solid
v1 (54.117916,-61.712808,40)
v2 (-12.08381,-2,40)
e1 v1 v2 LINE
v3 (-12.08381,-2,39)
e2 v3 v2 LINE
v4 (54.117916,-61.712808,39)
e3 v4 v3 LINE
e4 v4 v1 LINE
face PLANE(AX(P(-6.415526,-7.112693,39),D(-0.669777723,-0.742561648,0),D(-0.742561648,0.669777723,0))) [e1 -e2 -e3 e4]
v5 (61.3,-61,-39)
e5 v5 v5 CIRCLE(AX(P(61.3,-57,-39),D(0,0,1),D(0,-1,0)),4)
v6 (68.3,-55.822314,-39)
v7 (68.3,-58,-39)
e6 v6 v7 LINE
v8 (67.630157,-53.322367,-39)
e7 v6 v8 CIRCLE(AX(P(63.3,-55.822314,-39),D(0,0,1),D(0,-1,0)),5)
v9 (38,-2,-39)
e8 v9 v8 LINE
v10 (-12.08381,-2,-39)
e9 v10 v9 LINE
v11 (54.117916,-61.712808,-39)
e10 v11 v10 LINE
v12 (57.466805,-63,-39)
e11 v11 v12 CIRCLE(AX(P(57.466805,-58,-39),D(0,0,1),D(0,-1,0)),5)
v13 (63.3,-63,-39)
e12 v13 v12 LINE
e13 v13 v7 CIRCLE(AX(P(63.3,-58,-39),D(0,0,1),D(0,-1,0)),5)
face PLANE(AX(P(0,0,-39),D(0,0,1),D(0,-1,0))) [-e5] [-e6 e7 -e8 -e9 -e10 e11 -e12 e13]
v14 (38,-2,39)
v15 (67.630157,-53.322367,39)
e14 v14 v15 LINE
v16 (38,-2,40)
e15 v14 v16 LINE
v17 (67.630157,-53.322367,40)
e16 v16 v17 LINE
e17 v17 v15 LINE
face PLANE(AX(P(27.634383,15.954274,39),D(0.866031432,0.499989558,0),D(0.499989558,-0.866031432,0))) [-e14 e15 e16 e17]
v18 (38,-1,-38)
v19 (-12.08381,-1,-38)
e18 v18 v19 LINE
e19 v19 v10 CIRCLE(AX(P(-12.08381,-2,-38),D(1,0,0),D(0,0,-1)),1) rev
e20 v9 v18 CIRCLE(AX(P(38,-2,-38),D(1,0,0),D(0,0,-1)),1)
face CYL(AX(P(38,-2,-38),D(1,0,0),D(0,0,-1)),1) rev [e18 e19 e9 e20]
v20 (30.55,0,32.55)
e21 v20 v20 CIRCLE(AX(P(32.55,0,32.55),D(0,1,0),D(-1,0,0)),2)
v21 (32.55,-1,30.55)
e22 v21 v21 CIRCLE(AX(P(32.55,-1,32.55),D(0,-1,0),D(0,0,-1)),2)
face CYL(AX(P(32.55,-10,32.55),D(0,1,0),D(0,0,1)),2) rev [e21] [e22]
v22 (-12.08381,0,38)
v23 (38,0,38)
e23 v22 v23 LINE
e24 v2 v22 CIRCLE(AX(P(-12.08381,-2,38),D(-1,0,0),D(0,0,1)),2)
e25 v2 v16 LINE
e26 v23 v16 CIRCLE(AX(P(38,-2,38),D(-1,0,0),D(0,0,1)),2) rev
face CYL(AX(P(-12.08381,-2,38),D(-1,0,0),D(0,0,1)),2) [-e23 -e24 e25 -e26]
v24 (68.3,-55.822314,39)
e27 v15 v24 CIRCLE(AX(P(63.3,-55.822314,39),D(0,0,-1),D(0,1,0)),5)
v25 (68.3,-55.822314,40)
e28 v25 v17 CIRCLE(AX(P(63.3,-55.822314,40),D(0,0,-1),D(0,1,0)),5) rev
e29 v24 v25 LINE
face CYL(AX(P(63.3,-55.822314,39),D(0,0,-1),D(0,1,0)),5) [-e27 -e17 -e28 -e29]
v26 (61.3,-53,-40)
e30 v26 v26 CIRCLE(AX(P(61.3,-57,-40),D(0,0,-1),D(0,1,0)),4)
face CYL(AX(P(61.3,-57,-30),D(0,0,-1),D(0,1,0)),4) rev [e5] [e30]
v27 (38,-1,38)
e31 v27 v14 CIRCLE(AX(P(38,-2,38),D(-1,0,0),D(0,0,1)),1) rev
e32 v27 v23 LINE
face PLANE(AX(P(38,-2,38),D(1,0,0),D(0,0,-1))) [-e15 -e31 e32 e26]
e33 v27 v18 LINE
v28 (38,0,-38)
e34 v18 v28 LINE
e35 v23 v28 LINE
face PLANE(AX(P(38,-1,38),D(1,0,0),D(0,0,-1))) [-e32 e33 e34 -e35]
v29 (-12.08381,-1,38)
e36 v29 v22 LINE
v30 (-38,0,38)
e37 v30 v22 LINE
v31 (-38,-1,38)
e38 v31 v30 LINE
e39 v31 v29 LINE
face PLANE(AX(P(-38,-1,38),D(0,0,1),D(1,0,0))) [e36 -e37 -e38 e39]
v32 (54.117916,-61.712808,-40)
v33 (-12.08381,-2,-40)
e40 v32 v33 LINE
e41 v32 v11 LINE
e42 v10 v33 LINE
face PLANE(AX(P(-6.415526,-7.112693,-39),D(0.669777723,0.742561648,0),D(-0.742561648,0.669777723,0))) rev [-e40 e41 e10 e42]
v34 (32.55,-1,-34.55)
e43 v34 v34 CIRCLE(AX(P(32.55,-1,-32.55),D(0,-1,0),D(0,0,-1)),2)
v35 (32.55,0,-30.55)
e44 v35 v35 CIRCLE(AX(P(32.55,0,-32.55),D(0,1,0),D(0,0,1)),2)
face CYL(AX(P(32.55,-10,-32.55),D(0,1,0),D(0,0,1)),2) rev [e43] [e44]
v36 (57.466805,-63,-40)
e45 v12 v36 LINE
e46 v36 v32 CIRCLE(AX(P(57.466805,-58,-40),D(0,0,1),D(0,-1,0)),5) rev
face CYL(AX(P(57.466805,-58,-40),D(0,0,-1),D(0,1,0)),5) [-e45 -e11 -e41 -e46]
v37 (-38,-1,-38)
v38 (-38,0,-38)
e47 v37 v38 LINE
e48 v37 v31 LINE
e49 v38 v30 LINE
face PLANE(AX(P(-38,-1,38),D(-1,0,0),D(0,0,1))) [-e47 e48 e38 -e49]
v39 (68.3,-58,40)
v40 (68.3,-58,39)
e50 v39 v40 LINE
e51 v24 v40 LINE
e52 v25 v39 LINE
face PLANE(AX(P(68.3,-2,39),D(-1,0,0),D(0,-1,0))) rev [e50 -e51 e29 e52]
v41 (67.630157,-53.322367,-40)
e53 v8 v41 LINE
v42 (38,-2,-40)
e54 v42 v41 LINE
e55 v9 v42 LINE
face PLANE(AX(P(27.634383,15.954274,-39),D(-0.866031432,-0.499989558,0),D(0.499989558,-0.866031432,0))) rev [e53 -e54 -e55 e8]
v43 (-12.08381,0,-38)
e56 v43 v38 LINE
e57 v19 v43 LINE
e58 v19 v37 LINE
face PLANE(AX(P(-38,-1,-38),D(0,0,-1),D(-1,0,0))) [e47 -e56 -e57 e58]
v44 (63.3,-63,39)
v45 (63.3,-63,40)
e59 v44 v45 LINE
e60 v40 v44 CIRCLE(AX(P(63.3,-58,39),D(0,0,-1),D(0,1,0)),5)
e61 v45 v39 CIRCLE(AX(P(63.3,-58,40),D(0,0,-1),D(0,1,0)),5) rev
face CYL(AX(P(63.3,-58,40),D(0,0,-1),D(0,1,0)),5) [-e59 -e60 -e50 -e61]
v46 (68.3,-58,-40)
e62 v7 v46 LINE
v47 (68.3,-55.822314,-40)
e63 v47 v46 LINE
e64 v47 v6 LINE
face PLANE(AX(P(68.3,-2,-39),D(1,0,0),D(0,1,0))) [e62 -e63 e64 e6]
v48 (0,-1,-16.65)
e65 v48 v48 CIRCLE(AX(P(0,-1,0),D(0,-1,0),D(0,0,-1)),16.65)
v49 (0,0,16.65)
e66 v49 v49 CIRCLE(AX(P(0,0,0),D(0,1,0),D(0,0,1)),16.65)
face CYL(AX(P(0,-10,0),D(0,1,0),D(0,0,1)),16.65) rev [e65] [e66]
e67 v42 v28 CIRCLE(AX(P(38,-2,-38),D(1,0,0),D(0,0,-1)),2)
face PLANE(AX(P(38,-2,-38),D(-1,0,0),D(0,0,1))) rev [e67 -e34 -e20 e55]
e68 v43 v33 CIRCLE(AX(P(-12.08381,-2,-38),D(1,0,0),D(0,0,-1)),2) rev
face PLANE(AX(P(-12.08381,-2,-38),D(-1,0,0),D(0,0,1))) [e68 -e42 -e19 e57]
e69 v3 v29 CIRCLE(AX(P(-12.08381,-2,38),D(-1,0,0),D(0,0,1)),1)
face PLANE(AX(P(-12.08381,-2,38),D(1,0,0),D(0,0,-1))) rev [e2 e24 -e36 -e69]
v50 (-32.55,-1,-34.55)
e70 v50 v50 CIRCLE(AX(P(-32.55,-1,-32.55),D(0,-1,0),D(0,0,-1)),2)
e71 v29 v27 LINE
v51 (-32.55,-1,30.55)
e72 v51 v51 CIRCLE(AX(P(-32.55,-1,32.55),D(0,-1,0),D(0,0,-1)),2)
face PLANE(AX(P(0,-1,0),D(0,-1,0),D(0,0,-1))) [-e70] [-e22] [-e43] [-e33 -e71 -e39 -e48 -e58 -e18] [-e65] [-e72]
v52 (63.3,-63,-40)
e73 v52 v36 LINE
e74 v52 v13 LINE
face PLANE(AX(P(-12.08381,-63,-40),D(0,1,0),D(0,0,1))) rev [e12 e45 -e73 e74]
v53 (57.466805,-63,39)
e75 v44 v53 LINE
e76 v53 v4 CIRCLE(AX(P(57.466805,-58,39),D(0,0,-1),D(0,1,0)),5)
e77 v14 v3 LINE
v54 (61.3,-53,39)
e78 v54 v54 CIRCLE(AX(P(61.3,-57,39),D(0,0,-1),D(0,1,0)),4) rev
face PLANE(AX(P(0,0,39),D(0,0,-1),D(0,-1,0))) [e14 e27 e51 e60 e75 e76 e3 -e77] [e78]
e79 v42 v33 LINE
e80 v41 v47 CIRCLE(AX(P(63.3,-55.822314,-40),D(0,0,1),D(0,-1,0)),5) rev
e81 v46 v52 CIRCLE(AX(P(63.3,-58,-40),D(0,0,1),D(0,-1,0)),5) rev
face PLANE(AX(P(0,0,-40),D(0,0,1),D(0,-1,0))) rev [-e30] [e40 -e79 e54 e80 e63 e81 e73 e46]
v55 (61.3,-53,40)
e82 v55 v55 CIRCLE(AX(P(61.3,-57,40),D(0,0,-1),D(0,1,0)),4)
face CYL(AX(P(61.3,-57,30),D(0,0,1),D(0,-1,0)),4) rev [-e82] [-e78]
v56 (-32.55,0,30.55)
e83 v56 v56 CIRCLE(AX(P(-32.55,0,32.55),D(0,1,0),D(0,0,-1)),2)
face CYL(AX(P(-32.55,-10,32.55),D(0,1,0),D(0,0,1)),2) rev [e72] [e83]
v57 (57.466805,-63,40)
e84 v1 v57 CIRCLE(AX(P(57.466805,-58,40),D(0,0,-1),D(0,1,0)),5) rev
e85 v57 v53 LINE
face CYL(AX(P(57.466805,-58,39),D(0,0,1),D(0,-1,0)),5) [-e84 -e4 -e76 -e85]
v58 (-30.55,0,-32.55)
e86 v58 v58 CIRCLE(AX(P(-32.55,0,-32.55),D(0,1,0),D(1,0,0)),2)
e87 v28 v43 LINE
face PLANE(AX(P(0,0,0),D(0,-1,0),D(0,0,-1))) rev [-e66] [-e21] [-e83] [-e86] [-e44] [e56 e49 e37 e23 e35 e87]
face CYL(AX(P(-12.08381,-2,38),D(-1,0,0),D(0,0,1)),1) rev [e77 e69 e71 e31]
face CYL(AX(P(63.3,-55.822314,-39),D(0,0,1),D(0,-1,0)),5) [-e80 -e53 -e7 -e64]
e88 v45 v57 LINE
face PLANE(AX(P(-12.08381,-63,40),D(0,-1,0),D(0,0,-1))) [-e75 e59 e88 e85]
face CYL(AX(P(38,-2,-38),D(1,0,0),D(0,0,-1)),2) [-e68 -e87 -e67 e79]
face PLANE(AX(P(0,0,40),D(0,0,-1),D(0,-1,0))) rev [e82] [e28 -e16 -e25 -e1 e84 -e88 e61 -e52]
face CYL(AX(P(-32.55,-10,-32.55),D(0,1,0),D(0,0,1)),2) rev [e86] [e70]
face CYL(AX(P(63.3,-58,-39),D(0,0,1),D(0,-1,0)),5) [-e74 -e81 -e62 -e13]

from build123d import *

# Parameters (mm, degrees)
SKETCH2_W            = 76
SKETCH2_H            = 76
BASE_FLANGE1_DEPTH   = 1
SKETCH7_R            = 2
SKETCH7_R_2          = 16.65
CUT_EXTRUDE2_DEPTH   = 10
CIRPATTERN1_COUNT    = 4
EDGE_FLANGE1_DEPTH   = 50.083809579
SKETCH14_W           = 30.3
SKETCH14_H           = 61
TAB1_DEPTH           = 1
FILLET1_R            = 5
CUT_EXTRUDE4_DEPTH   = 10
CUT_EXTRUDE5_DEPTH   = 10
FILLET2_R            = 5
SKETCH19_R           = 4
CUT_EXTRUDE6_DEPTH   = 10
FILLET1_OF_MIRROR1_R = 5
FILLET2_OF_MIRROR1_R = 5


# Sheet-metal steps are written as plain solids
with BuildPart() as part:
    # Sketch2 → Base-Flange1 (new body)
    with BuildSketch(Plane(origin=(0, 0, 0), x_dir=(1, 0, 0), z_dir=(0, 1, 0))):
        Rectangle(SKETCH2_W, SKETCH2_H)
    extrude(amount=-BASE_FLANGE1_DEPTH)

    # Sketch7 → Cut-Extrude2 (cut)
    with BuildSketch(Plane(origin=(0, 0, 0), x_dir=(1, 0, 0), z_dir=(0, 1, 0))):
        with Locations(Location((32.55, 32.55, 0), (0, 0, 270))):
            Circle(SKETCH7_R)
        with Locations(Location((0, 0, 0), (0, 0, 270))):
            Circle(SKETCH7_R_2)
    cut_extrude2 = extrude(amount=-CUT_EXTRUDE2_DEPTH, mode=Mode.SUBTRACT)

    # CirPattern1: Cut-Extrude2 ×4 about axis
    cirpattern1_axis = Axis((0, 0, 0), (0, 1, 0))
    for i in range(1, CIRPATTERN1_COUNT):
        add(cut_extrude2.rotate(cirpattern1_axis, i * 360 / CIRPATTERN1_COUNT), mode=Mode.SUBTRACT)

    # Edge-Flange1 section (across the edge) → Edge-Flange1 (add)
    with BuildSketch(Plane(origin=(-12.083809579, -1, -39), x_dir=(0, 0, 1), z_dir=(1, 0, 0))):
        with BuildLine():
            Line((-1, 1), (-1, 62))
            Line((-1, 62), (0, 62))
            Line((0, 62), (0, 1))
            ThreePointArc((0, 1), (0.292893219, 0.292893219), (1, 0))
            Line((1, 0), (1, -1))
            ThreePointArc((1, -1), (-0.414213562, -0.414213562), (-1, 1))
        make_face()
    edge_flange1 = extrude(amount=EDGE_FLANGE1_DEPTH)

    # Sketch14 → Tab1 (add)
    with BuildSketch(Plane(origin=(0, 0, -40), x_dir=(-1, 0, 0), z_dir=(0, 0, -1))):
        with Locations((-53.15, -32.5)):
            Rectangle(SKETCH14_W, SKETCH14_H)
    tab1 = extrude(amount=-TAB1_DEPTH)

    # Fillet1
    fillet1_edges = [part.edges().sort_by_distance(p)[0] for p in [
        (68.3, -63, -39.5),
    ]]
    fillet(fillet1_edges, radius=FILLET1_R)

    # Sketch20 → Cut-Extrude4 (cut)
    with BuildSketch(Plane(origin=(0, 0, -40), x_dir=(-1, 0, 0), z_dir=(0, 0, -1))):
        Polygon((-38, -2), (-68.3, -54.482600826), (-68.3, -2), align=None)
    cut_extrude4 = extrude(amount=-CUT_EXTRUDE4_DEPTH, mode=Mode.SUBTRACT)

    # Sketch21 → Cut-Extrude5 (cut)
    with BuildSketch(Plane(origin=(0, 0, -40), x_dir=(-1, 0, 0), z_dir=(0, 0, -1))):
        Polygon((12.083809579, -2), (-55.544985759, -63), (12.083809579, -63), align=None)
    cut_extrude5 = extrude(amount=-CUT_EXTRUDE5_DEPTH, mode=Mode.SUBTRACT)

    # Fillet2
    fillet2_edges = [part.edges().sort_by_distance(p)[0] for p in [
        (55.544985759, -63, -39.5),
        (68.3, -54.482600826, -39.5),
    ]]
    fillet(fillet2_edges, radius=FILLET2_R)

    # Sketch19 → Cut-Extrude6 (cut)
    with BuildSketch(Plane(origin=(0, 0, -40), x_dir=(-1, 0, 0), z_dir=(0, 0, -1))):
        with Locations(Location((-61.3, -57, 0), (0, 0, 90))):
            Circle(SKETCH19_R)
    cut_extrude6 = extrude(amount=-CUT_EXTRUDE6_DEPTH, mode=Mode.SUBTRACT)

    # Mirror1: Edge-Flange1, Tab1, Cut-Extrude4, Cut-Extrude5, Cut-Extrude6 across plane
    add(edge_flange1.mirror(Plane.XY))
    add(tab1.mirror(Plane.XY))
    add(cut_extrude4.mirror(Plane.XY), mode=Mode.SUBTRACT)
    add(cut_extrude5.mirror(Plane.XY), mode=Mode.SUBTRACT)
    add(cut_extrude6.mirror(Plane.XY), mode=Mode.SUBTRACT)

    # Fillet1 of Mirror1
    fillet1_of_mirror1_edges = [part.edges().sort_by_distance(p)[0] for p in [
        (68.3, -63, 39.5),
    ]]
    fillet(fillet1_of_mirror1_edges, radius=FILLET1_OF_MIRROR1_R)

    # Fillet2 of Mirror1
    fillet2_of_mirror1_edges = [part.edges().sort_by_distance(p)[0] for p in [
        (55.544985759, -63, 39.5),
        (68.3, -54.482600826, 39.5),
    ]]
    fillet(fillet2_of_mirror1_edges, radius=FILLET2_OF_MIRROR1_R)


solid = part.part
